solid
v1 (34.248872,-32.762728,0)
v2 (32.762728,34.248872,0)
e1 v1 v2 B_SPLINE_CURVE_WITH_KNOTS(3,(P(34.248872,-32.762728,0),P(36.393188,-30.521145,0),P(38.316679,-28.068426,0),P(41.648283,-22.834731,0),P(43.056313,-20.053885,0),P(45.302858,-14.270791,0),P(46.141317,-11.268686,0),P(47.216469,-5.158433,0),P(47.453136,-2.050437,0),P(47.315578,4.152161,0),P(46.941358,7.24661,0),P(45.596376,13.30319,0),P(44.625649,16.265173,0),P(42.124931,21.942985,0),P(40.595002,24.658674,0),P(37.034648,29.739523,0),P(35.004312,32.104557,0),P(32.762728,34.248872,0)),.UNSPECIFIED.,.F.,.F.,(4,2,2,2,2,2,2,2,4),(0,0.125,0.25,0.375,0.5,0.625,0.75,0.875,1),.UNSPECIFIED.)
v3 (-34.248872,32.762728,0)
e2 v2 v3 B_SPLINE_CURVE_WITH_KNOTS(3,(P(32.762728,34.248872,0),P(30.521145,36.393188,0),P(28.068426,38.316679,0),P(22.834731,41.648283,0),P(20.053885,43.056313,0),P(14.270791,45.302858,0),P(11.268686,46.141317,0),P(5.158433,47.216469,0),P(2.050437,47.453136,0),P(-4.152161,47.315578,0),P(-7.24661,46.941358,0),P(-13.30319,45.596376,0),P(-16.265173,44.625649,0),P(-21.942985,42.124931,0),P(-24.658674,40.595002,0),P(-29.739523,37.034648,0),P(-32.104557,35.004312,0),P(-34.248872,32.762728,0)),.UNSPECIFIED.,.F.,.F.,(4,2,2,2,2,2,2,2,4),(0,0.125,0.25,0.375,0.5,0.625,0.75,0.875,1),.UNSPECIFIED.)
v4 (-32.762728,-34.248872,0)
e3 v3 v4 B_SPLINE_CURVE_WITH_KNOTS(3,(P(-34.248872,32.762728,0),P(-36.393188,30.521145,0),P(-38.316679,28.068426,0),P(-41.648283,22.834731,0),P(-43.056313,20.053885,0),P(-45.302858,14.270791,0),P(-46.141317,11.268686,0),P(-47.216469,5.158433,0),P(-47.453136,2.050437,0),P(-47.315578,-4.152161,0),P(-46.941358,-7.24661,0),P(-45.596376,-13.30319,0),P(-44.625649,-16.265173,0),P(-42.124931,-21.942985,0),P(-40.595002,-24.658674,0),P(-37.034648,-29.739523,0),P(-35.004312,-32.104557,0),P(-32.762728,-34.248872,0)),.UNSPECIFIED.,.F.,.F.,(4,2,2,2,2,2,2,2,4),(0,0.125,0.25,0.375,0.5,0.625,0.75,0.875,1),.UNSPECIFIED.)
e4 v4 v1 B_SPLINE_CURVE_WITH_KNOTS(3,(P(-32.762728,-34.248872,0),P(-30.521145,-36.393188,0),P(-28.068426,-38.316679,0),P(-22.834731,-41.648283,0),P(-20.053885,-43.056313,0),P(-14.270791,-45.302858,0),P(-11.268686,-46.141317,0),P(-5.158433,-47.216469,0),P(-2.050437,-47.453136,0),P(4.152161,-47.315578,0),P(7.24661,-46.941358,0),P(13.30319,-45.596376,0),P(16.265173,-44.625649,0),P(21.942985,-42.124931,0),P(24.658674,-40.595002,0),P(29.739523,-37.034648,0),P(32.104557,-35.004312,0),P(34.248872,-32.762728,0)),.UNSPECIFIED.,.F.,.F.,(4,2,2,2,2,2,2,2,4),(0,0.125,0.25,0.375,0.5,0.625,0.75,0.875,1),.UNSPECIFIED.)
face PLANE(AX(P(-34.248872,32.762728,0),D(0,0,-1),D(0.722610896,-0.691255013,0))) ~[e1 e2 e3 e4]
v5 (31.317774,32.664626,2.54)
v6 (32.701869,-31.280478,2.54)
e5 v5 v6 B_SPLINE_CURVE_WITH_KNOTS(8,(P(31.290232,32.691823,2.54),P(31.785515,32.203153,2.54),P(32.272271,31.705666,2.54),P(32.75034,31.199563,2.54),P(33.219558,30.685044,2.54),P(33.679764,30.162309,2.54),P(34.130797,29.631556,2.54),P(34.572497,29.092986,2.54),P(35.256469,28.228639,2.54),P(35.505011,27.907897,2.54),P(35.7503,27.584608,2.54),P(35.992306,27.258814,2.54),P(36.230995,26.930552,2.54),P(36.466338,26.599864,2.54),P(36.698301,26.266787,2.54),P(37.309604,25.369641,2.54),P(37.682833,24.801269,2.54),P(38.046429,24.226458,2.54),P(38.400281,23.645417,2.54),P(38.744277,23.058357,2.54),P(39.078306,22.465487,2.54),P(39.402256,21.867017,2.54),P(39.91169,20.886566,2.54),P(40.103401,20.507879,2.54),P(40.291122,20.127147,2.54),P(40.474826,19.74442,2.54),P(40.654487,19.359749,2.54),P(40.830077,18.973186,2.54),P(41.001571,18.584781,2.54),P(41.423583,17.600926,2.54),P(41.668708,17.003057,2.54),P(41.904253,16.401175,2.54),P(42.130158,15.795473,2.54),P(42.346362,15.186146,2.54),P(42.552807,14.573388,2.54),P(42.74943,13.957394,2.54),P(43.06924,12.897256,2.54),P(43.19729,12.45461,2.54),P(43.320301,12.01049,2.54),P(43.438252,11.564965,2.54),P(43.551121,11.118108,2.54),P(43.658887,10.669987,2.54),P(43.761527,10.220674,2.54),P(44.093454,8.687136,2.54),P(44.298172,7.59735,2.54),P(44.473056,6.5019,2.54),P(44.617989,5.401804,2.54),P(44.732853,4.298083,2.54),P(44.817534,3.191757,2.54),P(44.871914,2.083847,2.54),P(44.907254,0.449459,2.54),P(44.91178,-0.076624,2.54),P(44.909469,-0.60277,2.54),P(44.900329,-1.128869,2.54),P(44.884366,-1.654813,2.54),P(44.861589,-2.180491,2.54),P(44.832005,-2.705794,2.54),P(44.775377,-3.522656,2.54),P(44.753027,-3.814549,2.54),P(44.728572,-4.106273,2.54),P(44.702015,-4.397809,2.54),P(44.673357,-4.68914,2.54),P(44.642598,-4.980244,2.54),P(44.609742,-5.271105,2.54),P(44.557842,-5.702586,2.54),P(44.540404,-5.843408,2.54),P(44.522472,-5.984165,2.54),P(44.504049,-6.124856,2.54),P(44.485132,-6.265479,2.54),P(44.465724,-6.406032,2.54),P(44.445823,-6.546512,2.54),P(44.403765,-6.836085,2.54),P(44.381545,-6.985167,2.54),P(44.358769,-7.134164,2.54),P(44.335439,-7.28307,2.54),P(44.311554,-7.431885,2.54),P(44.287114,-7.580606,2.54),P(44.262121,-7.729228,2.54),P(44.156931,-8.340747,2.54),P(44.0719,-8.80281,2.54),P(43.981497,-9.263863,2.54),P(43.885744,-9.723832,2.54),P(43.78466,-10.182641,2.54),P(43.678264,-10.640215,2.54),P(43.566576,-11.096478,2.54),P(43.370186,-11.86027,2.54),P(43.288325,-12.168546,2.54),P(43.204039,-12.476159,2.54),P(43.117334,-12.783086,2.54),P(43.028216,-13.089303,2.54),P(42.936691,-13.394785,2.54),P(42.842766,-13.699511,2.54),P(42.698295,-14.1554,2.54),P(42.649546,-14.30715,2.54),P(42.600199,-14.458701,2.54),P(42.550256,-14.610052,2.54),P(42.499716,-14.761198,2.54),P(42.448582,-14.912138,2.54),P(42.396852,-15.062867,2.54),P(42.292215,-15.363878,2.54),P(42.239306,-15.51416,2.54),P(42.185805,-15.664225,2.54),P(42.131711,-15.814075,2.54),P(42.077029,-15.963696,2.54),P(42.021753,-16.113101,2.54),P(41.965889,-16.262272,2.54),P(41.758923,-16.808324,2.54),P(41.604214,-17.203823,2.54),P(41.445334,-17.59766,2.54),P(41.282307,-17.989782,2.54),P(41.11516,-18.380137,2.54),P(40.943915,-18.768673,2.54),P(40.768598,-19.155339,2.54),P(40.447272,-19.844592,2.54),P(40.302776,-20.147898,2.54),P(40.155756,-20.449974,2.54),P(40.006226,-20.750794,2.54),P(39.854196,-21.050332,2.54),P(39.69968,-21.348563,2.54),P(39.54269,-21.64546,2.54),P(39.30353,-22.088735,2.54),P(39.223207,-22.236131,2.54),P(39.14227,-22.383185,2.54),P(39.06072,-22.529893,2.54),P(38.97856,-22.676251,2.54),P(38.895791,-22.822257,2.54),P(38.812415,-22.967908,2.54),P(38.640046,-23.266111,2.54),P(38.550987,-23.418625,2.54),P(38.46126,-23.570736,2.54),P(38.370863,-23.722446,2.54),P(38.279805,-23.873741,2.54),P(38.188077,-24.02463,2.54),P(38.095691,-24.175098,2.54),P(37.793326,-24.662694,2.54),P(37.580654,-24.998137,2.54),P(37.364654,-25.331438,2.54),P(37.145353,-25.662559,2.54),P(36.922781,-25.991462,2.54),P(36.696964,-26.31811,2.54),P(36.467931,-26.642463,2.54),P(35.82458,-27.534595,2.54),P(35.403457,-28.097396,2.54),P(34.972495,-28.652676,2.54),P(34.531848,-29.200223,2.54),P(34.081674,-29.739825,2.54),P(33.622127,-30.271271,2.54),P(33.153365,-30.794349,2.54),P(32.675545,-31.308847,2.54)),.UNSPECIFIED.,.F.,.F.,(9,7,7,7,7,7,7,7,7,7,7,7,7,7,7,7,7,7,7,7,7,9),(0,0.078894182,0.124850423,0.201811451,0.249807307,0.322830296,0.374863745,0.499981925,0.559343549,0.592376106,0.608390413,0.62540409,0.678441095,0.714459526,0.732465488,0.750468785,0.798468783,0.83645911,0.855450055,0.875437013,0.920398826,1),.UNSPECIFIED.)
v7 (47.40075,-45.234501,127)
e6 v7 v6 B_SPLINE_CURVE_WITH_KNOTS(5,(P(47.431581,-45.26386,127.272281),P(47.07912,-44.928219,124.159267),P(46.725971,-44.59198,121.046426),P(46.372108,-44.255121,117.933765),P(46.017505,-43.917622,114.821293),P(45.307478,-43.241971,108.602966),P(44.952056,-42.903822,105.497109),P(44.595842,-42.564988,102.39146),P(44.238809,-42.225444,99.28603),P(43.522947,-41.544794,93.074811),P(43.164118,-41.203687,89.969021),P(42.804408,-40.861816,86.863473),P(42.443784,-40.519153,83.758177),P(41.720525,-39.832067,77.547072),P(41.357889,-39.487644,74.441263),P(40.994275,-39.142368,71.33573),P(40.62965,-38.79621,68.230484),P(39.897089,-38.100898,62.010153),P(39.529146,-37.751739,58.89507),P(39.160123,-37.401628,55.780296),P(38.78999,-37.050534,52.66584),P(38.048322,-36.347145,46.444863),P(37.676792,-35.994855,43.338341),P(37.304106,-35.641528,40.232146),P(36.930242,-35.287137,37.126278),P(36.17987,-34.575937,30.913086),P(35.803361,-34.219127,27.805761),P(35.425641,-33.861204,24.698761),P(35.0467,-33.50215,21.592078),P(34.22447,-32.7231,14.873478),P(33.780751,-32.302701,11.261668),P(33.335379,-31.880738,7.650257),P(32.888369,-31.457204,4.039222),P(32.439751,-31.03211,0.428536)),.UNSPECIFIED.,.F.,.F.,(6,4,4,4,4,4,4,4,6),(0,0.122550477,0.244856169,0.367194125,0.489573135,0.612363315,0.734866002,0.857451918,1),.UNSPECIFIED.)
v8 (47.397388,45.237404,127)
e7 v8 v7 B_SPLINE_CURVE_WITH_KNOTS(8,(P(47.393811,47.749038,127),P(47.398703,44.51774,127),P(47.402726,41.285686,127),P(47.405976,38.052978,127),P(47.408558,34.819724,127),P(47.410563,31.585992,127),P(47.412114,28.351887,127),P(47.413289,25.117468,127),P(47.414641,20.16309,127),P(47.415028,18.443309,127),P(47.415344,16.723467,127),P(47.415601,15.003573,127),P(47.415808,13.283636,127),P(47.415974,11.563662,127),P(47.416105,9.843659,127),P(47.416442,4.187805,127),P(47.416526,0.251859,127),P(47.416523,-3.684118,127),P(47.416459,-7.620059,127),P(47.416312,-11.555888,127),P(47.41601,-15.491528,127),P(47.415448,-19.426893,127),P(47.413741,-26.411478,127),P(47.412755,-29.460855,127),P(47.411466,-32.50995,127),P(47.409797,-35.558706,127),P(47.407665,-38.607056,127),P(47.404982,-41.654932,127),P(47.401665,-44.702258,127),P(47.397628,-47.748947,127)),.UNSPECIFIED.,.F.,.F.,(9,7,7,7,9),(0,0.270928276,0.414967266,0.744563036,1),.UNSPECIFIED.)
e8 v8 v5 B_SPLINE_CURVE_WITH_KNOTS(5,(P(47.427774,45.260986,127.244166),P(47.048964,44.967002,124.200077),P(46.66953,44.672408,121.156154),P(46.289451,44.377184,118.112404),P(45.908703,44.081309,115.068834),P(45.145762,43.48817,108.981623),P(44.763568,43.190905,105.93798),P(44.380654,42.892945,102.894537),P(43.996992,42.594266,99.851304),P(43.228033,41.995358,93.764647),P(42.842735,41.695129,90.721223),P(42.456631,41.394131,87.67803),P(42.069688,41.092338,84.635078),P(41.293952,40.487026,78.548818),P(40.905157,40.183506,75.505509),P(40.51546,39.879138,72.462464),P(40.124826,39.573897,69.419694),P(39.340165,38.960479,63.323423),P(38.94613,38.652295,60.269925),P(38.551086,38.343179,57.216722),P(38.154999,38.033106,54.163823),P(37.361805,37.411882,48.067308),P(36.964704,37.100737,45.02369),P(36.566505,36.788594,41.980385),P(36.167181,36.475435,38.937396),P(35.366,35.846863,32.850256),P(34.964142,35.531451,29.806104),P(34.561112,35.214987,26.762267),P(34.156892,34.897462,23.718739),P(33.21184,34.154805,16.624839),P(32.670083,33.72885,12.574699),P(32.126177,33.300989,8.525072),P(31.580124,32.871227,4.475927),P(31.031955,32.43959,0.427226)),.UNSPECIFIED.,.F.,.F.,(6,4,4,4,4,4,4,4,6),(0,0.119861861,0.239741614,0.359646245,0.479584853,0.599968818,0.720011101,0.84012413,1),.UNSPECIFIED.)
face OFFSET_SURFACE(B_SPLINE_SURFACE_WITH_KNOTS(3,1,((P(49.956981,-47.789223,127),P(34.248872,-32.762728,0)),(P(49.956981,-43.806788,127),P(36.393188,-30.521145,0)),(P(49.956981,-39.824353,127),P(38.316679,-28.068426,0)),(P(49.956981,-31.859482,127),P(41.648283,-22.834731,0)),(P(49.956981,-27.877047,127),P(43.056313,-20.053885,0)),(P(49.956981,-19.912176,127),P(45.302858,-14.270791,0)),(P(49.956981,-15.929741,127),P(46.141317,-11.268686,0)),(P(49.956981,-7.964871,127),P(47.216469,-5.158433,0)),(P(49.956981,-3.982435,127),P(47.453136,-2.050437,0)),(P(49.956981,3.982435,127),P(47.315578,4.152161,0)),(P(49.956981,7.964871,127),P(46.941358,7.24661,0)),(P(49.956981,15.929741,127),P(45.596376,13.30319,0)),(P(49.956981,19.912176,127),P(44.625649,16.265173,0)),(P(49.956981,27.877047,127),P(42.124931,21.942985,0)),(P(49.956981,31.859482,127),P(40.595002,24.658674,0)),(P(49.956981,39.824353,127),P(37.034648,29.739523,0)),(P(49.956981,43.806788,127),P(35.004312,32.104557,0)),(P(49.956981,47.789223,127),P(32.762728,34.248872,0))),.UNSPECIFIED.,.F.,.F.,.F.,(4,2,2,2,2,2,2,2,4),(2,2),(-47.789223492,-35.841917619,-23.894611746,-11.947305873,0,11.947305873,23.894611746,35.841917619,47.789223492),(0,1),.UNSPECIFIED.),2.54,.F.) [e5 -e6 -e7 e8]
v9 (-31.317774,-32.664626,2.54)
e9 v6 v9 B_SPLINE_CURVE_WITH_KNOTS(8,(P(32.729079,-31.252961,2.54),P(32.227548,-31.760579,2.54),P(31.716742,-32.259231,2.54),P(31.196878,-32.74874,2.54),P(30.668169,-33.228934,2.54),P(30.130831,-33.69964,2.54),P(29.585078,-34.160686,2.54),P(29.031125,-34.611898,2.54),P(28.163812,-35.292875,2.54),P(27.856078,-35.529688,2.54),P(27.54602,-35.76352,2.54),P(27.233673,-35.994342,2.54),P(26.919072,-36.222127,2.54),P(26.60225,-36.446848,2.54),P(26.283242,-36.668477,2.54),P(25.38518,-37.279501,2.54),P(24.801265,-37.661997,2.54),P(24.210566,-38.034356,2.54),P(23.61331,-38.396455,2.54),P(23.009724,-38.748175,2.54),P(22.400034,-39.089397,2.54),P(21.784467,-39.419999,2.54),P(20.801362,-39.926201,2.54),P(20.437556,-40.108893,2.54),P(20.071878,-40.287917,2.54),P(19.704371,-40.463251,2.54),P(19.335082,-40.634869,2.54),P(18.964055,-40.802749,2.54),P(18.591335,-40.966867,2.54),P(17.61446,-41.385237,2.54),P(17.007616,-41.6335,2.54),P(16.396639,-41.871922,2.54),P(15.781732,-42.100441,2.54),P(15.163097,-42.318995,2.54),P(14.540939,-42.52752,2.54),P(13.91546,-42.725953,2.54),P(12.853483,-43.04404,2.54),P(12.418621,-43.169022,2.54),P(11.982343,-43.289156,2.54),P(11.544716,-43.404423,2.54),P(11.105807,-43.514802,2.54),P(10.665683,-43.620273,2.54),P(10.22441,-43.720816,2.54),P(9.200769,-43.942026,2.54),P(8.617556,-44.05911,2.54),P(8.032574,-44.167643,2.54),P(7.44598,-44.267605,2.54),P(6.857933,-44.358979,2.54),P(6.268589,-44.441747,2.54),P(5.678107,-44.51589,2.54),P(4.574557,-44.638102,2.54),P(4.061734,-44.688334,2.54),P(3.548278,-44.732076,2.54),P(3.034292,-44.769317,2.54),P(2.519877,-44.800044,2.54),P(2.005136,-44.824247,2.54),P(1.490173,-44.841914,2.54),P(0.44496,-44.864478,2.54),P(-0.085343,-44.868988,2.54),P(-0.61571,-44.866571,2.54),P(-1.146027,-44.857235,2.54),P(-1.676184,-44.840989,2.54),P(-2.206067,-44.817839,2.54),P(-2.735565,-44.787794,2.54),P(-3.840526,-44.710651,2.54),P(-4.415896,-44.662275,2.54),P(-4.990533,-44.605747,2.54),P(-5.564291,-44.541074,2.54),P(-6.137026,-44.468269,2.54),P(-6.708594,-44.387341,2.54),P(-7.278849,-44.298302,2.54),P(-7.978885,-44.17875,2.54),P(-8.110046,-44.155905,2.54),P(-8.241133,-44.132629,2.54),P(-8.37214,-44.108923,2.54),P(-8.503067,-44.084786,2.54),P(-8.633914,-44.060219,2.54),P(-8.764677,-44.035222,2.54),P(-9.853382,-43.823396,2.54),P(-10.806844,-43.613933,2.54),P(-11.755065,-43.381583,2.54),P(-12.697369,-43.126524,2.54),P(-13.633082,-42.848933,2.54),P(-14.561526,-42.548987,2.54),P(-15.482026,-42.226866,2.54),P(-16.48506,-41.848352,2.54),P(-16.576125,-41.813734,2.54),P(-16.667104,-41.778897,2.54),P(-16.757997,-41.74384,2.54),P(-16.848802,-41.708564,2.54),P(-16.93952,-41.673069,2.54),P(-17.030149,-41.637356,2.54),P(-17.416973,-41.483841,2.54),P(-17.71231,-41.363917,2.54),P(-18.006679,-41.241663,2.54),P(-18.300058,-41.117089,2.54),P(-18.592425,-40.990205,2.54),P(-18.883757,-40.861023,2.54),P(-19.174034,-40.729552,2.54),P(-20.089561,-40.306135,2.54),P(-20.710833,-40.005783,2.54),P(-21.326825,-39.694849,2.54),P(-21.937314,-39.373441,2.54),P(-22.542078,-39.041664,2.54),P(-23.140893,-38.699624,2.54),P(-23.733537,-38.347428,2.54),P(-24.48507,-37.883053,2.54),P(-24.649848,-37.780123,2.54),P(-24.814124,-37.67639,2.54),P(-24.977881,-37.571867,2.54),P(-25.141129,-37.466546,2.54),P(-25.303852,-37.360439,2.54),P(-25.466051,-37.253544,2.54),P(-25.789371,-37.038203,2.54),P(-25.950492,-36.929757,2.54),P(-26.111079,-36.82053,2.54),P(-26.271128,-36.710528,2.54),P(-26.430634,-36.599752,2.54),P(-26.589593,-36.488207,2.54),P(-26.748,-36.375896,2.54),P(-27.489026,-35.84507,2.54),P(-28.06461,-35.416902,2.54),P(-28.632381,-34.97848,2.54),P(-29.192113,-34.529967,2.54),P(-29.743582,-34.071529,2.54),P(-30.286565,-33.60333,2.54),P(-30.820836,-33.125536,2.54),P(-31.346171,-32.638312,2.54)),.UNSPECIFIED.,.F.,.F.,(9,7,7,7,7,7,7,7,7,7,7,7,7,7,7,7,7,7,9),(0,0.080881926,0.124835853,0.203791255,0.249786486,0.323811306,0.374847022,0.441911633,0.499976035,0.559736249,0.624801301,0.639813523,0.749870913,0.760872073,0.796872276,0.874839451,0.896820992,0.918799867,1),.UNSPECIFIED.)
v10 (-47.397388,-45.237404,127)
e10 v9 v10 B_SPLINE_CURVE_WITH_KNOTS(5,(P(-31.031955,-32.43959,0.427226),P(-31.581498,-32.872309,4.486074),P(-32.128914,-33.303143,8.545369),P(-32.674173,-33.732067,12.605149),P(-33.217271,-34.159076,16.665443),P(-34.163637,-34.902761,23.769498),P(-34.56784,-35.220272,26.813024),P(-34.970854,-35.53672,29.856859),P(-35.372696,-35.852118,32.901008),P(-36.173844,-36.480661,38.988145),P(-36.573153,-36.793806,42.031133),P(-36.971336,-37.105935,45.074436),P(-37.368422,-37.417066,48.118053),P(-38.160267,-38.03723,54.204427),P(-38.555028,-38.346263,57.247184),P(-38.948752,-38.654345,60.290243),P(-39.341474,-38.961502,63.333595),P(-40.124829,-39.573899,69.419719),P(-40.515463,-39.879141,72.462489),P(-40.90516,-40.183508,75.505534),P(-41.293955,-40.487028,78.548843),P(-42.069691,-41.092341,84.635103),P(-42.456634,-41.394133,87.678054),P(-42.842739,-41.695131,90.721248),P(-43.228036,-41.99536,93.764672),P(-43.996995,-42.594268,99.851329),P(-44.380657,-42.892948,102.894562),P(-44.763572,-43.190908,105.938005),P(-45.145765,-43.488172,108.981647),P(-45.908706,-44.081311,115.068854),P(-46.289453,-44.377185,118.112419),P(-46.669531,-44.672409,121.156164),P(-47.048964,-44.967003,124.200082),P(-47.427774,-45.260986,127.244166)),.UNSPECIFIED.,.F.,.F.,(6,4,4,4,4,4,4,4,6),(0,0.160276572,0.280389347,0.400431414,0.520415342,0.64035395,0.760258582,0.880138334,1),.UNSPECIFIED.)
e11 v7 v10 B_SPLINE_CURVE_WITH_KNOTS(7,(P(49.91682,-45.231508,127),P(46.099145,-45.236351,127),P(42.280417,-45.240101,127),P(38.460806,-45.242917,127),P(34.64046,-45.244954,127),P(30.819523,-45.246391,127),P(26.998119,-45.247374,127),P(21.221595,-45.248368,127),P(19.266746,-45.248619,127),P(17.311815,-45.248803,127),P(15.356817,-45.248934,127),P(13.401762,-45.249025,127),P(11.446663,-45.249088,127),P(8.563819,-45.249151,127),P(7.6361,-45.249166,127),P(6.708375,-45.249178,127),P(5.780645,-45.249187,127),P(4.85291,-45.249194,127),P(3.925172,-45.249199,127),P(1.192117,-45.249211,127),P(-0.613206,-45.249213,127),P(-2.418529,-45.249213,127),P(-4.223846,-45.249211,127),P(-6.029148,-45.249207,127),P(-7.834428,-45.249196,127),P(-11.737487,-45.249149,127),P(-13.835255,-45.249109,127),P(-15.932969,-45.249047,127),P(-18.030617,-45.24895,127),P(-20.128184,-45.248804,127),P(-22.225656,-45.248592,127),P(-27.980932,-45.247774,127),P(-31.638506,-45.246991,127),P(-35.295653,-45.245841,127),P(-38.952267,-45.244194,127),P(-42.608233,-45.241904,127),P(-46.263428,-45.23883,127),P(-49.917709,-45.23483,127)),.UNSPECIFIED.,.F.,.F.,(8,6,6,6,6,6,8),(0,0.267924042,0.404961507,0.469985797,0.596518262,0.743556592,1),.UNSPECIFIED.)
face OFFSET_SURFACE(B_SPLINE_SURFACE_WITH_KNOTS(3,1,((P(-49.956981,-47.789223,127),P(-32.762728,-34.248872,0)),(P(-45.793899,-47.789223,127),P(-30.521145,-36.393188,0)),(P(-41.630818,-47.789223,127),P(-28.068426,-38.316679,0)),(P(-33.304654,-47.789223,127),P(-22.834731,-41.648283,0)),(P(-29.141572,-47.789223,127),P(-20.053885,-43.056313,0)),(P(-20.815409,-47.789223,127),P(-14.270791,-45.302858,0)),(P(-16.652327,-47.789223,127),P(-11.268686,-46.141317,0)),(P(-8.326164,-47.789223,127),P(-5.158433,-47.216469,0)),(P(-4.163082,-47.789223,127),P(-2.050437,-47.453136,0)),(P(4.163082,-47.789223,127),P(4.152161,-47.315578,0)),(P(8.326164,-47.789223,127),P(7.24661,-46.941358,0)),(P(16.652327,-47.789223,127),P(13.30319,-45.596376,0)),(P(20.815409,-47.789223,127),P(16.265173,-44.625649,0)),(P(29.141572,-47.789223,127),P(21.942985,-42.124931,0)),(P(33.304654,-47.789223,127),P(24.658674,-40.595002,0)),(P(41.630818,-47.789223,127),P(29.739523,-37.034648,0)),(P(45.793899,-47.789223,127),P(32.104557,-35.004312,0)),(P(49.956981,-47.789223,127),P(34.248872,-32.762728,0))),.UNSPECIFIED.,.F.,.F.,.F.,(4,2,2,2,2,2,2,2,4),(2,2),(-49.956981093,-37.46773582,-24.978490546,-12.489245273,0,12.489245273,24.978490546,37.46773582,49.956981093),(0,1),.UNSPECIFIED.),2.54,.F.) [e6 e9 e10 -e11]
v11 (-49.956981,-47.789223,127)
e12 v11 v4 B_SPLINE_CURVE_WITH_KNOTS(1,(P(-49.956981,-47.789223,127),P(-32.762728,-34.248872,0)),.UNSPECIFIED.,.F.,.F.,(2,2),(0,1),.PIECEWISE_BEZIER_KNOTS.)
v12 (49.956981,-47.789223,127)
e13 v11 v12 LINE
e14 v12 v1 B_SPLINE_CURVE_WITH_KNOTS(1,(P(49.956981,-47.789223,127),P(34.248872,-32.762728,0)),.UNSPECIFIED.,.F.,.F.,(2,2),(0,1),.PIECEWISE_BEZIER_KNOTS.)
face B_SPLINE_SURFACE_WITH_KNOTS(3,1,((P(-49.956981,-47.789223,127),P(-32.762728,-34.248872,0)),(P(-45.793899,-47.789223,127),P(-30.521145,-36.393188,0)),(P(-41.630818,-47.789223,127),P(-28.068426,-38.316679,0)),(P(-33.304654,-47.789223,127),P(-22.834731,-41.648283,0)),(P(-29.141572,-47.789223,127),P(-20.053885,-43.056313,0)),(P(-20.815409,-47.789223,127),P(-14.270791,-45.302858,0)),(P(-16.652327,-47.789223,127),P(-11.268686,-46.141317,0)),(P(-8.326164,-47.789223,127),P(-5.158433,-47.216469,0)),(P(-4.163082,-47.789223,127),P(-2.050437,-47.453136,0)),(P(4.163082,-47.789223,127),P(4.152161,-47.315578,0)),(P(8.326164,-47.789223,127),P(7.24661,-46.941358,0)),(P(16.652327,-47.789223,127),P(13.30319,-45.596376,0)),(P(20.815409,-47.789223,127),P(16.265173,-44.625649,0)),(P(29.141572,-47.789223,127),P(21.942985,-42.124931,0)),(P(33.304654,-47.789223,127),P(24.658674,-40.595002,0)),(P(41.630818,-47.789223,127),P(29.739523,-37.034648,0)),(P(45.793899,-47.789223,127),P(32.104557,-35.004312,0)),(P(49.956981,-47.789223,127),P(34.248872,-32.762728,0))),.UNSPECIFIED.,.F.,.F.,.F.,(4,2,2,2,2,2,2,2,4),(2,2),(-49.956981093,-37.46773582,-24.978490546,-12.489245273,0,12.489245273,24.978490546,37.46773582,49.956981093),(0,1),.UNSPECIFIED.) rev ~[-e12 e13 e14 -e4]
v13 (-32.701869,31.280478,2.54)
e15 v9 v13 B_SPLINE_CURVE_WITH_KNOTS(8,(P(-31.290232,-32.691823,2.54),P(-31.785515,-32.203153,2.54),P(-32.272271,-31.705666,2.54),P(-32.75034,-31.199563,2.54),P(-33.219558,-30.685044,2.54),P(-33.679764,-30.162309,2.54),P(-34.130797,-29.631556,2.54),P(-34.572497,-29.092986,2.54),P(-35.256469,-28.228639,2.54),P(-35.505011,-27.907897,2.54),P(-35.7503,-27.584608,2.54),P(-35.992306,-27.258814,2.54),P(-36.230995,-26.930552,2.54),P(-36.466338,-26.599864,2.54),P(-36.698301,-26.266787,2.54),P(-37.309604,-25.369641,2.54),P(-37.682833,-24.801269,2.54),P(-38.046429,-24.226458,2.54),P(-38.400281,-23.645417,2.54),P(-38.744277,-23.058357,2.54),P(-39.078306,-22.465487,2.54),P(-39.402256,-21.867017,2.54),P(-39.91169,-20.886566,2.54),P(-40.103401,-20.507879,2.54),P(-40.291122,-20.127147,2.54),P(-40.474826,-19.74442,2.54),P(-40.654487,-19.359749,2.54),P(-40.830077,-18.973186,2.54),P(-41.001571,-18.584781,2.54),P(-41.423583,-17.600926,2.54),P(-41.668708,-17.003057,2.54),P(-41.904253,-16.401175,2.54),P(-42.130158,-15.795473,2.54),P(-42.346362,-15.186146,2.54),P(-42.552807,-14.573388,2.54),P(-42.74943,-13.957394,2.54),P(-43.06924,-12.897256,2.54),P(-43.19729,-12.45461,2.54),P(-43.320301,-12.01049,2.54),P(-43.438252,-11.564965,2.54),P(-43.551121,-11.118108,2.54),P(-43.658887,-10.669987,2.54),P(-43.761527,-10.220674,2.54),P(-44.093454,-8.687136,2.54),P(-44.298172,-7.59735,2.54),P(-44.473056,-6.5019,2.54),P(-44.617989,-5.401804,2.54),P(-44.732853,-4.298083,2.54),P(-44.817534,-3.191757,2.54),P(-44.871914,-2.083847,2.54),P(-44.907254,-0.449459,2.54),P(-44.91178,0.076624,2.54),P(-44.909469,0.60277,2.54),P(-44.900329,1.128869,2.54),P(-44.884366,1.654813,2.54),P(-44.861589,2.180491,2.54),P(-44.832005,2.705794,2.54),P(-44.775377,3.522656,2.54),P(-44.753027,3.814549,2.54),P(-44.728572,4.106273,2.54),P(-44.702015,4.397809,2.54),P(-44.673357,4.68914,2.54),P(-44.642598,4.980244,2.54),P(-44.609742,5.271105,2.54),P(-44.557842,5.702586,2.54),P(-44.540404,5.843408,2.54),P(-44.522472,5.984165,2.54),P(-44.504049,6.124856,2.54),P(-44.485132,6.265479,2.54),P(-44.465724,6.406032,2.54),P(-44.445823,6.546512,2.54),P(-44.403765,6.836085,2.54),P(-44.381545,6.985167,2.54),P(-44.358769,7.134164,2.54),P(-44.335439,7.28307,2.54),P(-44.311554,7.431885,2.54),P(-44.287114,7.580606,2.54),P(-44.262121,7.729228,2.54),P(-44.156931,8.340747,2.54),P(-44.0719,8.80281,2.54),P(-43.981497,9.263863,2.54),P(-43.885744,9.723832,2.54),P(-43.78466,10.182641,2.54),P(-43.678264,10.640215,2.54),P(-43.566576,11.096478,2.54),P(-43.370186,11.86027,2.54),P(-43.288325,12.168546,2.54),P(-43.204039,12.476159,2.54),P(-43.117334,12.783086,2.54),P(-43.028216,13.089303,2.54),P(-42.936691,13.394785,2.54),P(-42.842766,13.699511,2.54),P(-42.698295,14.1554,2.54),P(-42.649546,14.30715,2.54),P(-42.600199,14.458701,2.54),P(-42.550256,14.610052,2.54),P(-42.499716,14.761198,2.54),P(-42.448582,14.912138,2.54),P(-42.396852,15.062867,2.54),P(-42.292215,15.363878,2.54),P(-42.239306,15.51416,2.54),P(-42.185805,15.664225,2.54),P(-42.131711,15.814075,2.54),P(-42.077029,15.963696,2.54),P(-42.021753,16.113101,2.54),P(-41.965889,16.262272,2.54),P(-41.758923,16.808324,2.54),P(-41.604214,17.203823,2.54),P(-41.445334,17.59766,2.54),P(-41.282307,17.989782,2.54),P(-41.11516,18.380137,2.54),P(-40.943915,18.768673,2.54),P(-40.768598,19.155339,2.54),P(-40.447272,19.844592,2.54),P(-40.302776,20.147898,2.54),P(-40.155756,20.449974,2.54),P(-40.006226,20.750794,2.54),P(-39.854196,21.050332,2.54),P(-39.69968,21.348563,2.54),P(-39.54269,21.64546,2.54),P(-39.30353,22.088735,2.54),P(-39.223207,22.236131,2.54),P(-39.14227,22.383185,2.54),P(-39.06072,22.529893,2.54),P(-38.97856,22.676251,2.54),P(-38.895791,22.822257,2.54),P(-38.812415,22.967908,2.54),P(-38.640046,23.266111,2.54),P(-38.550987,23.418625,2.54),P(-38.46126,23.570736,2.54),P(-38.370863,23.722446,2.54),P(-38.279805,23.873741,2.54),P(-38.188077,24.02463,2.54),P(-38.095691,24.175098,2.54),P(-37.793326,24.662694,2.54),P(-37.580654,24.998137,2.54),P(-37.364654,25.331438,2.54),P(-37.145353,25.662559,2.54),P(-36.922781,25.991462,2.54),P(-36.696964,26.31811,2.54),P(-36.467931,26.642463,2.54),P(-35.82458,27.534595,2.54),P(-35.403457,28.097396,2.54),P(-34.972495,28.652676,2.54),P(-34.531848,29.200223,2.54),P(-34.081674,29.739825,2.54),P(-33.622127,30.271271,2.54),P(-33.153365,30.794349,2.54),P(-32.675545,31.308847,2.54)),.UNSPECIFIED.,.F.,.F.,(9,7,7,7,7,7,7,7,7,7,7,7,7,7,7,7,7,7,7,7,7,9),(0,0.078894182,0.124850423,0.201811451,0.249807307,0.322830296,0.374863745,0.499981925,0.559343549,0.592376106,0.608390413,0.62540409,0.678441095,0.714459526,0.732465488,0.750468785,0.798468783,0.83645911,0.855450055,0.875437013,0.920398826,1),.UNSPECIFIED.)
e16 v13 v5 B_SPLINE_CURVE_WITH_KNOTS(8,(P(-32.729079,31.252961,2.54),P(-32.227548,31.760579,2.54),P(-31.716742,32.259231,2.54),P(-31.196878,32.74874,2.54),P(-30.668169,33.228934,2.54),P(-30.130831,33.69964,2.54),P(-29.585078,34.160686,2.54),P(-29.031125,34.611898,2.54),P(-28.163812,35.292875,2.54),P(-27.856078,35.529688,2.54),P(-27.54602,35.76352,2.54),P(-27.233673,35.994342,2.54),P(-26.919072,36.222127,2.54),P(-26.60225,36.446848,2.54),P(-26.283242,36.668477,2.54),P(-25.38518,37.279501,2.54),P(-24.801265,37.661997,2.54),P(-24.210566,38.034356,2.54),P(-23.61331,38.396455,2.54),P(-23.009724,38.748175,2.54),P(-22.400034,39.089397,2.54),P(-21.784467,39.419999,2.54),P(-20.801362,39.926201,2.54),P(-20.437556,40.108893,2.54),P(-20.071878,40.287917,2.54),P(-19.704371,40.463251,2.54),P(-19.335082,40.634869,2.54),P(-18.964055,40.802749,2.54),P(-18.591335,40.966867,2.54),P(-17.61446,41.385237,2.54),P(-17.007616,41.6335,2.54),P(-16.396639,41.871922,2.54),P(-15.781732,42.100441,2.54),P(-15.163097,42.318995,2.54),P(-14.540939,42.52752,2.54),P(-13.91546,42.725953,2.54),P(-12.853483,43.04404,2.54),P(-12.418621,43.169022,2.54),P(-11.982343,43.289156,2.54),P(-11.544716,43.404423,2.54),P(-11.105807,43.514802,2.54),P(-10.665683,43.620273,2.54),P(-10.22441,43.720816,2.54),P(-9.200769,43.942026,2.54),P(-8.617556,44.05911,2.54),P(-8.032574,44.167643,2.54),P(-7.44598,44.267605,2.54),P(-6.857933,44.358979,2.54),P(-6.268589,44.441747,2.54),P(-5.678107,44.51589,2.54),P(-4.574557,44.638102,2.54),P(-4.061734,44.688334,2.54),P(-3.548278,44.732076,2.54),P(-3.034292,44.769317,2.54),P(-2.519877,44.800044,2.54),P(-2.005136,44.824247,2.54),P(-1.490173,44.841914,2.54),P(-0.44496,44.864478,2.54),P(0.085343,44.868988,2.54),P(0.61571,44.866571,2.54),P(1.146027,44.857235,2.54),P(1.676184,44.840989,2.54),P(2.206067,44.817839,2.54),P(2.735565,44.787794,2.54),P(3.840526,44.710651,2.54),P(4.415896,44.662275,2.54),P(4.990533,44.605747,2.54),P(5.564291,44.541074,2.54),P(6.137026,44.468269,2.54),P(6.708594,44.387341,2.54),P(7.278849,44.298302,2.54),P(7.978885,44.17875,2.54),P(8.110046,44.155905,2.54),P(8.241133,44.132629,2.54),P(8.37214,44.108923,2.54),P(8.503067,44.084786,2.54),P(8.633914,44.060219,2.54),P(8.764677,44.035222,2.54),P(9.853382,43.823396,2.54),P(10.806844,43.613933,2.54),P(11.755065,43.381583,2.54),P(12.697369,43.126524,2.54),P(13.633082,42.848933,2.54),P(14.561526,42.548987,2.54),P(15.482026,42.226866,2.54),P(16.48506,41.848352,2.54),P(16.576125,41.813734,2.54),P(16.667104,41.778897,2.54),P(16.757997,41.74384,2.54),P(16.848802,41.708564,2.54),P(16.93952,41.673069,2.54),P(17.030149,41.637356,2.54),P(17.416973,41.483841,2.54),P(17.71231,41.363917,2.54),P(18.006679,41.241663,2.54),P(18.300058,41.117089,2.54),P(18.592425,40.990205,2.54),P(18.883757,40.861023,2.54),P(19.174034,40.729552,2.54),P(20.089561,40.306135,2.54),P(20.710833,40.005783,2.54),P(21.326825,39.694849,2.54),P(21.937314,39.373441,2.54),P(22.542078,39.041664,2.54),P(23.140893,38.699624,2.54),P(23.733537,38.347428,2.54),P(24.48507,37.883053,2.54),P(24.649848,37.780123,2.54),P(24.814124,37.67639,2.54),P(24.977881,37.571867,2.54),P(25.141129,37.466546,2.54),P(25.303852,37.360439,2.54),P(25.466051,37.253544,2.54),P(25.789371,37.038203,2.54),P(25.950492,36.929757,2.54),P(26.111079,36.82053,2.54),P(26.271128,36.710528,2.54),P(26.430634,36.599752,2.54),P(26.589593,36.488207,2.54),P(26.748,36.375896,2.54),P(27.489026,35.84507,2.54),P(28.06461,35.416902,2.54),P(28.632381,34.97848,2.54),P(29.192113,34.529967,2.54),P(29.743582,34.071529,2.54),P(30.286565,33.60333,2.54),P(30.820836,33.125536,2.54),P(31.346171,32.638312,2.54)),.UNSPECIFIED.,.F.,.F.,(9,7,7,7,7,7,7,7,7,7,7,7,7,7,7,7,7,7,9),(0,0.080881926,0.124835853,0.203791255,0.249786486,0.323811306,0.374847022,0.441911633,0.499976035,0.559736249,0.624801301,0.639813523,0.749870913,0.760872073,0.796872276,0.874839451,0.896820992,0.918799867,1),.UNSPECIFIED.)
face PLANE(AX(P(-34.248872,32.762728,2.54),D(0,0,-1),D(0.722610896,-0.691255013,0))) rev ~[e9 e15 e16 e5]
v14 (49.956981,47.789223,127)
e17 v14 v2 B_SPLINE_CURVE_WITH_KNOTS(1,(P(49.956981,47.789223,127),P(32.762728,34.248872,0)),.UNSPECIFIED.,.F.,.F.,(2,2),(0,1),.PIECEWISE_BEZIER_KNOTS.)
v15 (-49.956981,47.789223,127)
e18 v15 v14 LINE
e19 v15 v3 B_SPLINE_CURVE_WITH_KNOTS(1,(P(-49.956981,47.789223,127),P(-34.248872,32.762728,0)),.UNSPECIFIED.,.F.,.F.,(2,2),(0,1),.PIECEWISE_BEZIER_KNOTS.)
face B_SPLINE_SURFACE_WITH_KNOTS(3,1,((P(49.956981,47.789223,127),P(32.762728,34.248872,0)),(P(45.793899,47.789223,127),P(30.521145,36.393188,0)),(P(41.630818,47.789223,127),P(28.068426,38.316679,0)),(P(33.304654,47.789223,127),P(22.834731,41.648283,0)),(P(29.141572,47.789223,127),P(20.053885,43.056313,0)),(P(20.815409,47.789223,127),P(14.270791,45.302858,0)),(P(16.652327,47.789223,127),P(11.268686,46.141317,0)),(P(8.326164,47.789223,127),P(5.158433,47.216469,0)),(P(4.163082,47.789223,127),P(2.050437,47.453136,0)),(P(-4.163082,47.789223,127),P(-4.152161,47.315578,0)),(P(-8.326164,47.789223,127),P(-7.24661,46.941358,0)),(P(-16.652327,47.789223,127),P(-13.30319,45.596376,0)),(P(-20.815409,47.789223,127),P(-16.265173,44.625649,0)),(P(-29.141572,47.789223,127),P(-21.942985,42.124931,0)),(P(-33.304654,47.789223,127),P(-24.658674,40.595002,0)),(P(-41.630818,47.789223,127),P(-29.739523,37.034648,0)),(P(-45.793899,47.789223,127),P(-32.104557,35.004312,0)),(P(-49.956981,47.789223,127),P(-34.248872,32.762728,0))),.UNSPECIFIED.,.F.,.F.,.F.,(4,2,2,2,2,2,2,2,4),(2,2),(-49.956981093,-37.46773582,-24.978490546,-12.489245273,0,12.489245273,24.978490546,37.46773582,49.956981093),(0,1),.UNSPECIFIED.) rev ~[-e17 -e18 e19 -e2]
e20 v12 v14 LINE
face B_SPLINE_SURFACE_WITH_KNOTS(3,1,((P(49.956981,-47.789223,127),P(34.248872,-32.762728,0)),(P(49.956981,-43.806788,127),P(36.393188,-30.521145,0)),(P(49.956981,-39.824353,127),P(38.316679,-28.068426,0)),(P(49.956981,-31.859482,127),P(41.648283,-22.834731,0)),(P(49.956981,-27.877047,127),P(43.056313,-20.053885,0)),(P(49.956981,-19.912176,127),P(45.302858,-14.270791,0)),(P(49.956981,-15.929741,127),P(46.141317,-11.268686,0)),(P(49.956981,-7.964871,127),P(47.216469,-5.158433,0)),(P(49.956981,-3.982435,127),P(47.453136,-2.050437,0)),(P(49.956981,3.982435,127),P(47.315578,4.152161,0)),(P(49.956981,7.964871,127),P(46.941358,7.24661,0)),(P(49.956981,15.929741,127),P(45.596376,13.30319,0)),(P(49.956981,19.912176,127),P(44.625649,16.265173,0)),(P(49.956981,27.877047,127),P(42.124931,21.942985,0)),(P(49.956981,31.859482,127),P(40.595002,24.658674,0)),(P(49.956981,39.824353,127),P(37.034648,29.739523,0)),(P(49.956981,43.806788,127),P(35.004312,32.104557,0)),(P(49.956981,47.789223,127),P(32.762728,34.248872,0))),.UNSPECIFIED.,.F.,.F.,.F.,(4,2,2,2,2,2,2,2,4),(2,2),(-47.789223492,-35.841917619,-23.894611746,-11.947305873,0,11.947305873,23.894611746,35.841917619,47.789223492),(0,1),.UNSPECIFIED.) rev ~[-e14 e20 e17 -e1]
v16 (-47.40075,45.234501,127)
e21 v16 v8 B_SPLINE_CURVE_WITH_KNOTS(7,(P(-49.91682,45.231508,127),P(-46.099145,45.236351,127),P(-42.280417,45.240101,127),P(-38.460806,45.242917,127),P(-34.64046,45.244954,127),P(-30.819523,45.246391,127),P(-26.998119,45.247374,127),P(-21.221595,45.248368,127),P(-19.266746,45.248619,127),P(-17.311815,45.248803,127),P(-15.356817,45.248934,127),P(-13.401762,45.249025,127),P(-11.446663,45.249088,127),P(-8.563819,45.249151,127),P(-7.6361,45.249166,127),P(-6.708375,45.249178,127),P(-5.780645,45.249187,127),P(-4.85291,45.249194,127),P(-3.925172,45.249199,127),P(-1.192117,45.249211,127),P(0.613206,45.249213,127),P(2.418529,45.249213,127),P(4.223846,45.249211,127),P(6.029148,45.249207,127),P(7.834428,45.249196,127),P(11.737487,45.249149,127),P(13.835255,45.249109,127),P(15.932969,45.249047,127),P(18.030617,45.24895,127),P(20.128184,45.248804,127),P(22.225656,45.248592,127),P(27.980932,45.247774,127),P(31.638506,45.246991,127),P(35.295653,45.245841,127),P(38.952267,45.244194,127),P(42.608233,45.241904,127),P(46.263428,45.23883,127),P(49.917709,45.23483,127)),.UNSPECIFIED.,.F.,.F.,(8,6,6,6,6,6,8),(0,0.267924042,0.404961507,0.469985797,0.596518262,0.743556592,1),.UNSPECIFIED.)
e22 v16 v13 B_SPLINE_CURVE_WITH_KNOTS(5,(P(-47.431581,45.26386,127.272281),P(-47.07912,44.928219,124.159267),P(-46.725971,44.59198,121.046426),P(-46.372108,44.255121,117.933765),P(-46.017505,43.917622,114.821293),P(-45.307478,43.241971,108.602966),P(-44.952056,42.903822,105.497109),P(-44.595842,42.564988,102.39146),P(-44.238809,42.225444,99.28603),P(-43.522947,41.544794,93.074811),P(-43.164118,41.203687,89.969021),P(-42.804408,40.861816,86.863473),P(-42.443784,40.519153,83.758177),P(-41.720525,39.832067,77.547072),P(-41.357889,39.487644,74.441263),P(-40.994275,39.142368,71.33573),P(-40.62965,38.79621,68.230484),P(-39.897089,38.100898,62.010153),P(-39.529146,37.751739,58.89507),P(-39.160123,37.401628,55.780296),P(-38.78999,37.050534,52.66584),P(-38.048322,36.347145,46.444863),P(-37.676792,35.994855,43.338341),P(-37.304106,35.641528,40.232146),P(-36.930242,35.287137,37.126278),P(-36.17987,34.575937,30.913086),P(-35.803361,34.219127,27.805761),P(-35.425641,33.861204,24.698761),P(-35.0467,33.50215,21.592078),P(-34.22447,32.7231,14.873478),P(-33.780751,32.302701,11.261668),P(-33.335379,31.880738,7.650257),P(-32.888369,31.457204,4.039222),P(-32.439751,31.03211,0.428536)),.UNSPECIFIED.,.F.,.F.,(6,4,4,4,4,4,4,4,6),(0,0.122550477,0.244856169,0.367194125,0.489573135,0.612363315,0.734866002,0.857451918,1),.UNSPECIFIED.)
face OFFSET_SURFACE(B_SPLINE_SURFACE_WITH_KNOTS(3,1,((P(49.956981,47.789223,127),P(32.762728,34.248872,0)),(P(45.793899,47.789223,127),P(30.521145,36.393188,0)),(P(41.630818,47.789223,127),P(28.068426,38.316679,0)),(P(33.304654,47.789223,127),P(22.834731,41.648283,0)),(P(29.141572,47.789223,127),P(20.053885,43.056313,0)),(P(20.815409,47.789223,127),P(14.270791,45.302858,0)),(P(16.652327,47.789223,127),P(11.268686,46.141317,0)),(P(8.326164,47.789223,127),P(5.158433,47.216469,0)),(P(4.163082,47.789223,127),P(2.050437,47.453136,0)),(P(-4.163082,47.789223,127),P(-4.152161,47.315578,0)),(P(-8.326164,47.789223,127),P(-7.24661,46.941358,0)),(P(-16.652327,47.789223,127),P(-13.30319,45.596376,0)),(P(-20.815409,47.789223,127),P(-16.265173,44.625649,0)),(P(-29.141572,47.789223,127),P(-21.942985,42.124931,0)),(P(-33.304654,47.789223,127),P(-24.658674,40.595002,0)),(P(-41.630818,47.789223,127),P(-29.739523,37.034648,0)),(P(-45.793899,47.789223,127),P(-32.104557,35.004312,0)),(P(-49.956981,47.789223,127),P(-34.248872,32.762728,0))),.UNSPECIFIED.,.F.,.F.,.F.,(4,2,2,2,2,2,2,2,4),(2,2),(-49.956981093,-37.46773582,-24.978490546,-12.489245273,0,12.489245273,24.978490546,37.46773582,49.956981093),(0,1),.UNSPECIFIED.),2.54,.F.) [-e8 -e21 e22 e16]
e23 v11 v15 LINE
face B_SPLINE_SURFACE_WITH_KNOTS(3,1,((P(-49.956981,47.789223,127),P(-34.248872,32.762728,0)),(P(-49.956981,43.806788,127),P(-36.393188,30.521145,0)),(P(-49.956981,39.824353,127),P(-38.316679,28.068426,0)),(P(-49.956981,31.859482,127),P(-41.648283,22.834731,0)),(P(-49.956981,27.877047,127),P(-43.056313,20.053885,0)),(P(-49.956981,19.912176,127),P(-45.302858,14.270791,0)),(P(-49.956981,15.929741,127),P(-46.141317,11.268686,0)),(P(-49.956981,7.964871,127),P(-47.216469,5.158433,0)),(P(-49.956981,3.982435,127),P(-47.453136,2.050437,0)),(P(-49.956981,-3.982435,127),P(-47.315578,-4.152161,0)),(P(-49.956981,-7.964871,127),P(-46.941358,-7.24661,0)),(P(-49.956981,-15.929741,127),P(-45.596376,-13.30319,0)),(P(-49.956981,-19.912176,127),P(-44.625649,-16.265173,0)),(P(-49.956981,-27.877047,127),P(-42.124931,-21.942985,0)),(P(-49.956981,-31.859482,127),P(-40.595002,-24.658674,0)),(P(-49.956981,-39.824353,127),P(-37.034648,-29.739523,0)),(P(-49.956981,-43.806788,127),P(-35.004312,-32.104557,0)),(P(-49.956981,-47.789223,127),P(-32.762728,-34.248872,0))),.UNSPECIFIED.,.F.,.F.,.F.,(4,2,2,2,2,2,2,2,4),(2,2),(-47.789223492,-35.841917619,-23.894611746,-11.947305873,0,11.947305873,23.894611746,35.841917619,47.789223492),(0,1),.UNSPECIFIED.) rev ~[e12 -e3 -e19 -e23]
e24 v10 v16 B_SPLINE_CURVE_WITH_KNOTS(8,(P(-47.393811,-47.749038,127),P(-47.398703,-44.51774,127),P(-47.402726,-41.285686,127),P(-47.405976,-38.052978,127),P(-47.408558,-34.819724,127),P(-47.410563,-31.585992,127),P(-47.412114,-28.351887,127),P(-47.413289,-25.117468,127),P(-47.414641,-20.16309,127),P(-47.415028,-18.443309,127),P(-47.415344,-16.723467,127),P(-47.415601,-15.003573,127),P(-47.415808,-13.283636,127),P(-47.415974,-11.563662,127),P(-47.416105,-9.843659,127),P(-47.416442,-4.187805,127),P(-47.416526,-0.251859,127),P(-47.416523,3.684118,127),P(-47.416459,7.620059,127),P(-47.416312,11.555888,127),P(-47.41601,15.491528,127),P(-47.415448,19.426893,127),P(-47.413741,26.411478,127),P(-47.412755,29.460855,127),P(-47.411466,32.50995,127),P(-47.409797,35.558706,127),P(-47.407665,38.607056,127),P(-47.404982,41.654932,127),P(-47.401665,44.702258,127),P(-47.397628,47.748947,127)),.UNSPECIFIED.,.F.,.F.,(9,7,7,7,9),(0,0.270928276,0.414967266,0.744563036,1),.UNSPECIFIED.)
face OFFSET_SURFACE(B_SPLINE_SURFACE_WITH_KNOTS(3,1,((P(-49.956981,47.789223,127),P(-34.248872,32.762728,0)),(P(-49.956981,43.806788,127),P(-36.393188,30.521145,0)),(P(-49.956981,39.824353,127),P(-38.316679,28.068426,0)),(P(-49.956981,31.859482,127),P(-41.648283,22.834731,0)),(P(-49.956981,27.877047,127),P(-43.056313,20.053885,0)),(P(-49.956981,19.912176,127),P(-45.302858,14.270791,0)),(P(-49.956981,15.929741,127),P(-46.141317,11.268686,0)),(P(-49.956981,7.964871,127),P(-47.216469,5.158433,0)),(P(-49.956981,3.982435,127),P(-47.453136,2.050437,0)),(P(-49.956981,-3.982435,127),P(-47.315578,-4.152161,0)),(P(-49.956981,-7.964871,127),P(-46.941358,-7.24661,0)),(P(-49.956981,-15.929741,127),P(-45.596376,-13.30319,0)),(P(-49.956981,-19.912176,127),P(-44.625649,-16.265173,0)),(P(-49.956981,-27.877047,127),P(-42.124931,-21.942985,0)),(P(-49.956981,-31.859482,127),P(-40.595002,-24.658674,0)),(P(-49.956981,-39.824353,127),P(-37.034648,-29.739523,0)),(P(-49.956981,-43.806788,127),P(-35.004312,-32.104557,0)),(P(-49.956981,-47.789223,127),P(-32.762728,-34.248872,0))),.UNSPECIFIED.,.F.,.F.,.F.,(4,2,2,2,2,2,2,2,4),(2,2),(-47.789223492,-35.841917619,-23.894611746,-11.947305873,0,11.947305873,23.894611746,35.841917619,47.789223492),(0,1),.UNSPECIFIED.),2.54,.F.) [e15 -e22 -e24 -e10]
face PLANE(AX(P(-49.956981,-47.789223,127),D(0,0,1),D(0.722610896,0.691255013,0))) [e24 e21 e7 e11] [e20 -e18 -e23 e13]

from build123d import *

# Parameters (mm, degrees)
F2_W = 99.9139621854
F2_H = 95.5784469843
F4_T = 2.54


# Not quite as in the source:
# - the arcs of a loft's sections are written as splines that run evenly, so that the points pair up as in the source's solid
# - a shell that OpenCascade refuses in one call is made with other operations: the cavity is built on its own and cut out


with BuildPart() as f3:
    # F2 (on offset) → F3 section 0
    with BuildSketch(Plane.XY.offset(127)):
        Rectangle(F2_W, F2_H)
    # F0 (on Top) → F3 section 1
    with BuildSketch(Plane.XY):
        with BuildLine():
            add(Edge.make_bspline(
                [(34.2488721695, -32.7627284648), (36.3931877331, -30.5211450231), (38.3166790346, -28.0684255821), (41.6482828465, -22.8347310657), (43.0563129764, -20.0538854036), (45.3028578067, -14.2707911992), (46.1413169567, -11.2686856553), (47.2164693474, -5.1584328302), (47.4531360028, -2.0504366369), (47.3155784505, 4.1521612197), (46.9413576443, 7.2466095116), (45.5963764086, 13.3031900424), (44.6256492365, 16.2651725205), (42.1249311921, 21.9429847323), (40.5950021549, 24.658674071), (37.0346484938, 29.7395228248), (35.0043119065, 32.1045566058), (32.7627284648, 34.2488721695)],
                knots=[0, 0, 0, 0, 0.125, 0.125, 0.25, 0.25, 0.375, 0.375, 0.5, 0.5, 0.625, 0.625, 0.75, 0.75, 0.875, 0.875, 1, 1, 1, 1], degree=3))
            add(Edge.make_bspline(
                [(32.7627284648, 34.2488721695), (30.5211450231, 36.3931877331), (28.0684255821, 38.3166790346), (22.8347310657, 41.6482828465), (20.0538854036, 43.0563129764), (14.2707911992, 45.3028578067), (11.2686856553, 46.1413169567), (5.1584328302, 47.2164693474), (2.0504366369, 47.4531360028), (-4.1521612197, 47.3155784505), (-7.2466095116, 46.9413576443), (-13.3031900424, 45.5963764086), (-16.2651725205, 44.6256492365), (-21.9429847323, 42.1249311921), (-24.658674071, 40.5950021549), (-29.7395228248, 37.0346484938), (-32.1045566058, 35.0043119065), (-34.2488721695, 32.7627284648)],
                knots=[0, 0, 0, 0, 0.125, 0.125, 0.25, 0.25, 0.375, 0.375, 0.5, 0.5, 0.625, 0.625, 0.75, 0.75, 0.875, 0.875, 1, 1, 1, 1], degree=3))
            add(Edge.make_bspline(
                [(-34.2488721695, 32.7627284648), (-36.3931877331, 30.5211450231), (-38.3166790346, 28.0684255821), (-41.6482828465, 22.8347310657), (-43.0563129764, 20.0538854036), (-45.3028578067, 14.2707911992), (-46.1413169567, 11.2686856553), (-47.2164693474, 5.1584328302), (-47.4531360028, 2.0504366369), (-47.3155784505, -4.1521612197), (-46.9413576443, -7.2466095116), (-45.5963764086, -13.3031900424), (-44.6256492365, -16.2651725205), (-42.1249311921, -21.9429847323), (-40.5950021549, -24.658674071), (-37.0346484938, -29.7395228248), (-35.0043119065, -32.1045566058), (-32.7627284648, -34.2488721695)],
                knots=[0, 0, 0, 0, 0.125, 0.125, 0.25, 0.25, 0.375, 0.375, 0.5, 0.5, 0.625, 0.625, 0.75, 0.75, 0.875, 0.875, 1, 1, 1, 1], degree=3))
            add(Edge.make_bspline(
                [(-32.7627284648, -34.2488721695), (-30.5211450231, -36.3931877331), (-28.0684255821, -38.3166790346), (-22.8347310657, -41.6482828465), (-20.0538854036, -43.0563129764), (-14.2707911992, -45.3028578067), (-11.2686856553, -46.1413169567), (-5.1584328302, -47.2164693474), (-2.0504366369, -47.4531360028), (4.1521612197, -47.3155784505), (7.2466095116, -46.9413576443), (13.3031900424, -45.5963764086), (16.2651725205, -44.6256492365), (21.9429847323, -42.1249311921), (24.658674071, -40.5950021549), (29.7395228248, -37.0346484938), (32.1045566058, -35.0043119065), (34.2488721695, -32.7627284648)],
                knots=[0, 0, 0, 0, 0.125, 0.125, 0.25, 0.25, 0.375, 0.375, 0.5, 0.5, 0.625, 0.625, 0.75, 0.75, 0.875, 0.875, 1, 1, 1, 1], degree=3))
        make_face()
    loft(ruled=True)

    # F4: shell of thickness 2.54, made by hand


with BuildPart() as f4_core1:
    # F4_t2: copy of F3
    add(f3.part)

    # the walls: a layer under each face that stays
    f4_faces = [f4_core1.faces().sort_by_distance(p)[0] for p in [
        (0.5254311457, -47.5867903594, 63.5),
        (48.6706691597, 0.5254311457, 63.5),
        (-0.5254311457, 47.5867903594, 63.5),
        (-48.6706691597, -0.5254311457, 63.5),
        (0, 0, 0),
    ]]
    thicken(f4_faces, amount=-F4_T, mode=Mode.SUBTRACT)


with BuildPart() as f3_1:
    add(f3.part)

    # what is left inside the walls is the cavity
    f4_cavity = [f4_core1.part.solids().sort_by_distance(p)[0] for p in [
        (0.329341, -45.091155, 85.374003),
    ]]
    add(f4_cavity, mode=Mode.SUBTRACT)


solid = f3_1.part
